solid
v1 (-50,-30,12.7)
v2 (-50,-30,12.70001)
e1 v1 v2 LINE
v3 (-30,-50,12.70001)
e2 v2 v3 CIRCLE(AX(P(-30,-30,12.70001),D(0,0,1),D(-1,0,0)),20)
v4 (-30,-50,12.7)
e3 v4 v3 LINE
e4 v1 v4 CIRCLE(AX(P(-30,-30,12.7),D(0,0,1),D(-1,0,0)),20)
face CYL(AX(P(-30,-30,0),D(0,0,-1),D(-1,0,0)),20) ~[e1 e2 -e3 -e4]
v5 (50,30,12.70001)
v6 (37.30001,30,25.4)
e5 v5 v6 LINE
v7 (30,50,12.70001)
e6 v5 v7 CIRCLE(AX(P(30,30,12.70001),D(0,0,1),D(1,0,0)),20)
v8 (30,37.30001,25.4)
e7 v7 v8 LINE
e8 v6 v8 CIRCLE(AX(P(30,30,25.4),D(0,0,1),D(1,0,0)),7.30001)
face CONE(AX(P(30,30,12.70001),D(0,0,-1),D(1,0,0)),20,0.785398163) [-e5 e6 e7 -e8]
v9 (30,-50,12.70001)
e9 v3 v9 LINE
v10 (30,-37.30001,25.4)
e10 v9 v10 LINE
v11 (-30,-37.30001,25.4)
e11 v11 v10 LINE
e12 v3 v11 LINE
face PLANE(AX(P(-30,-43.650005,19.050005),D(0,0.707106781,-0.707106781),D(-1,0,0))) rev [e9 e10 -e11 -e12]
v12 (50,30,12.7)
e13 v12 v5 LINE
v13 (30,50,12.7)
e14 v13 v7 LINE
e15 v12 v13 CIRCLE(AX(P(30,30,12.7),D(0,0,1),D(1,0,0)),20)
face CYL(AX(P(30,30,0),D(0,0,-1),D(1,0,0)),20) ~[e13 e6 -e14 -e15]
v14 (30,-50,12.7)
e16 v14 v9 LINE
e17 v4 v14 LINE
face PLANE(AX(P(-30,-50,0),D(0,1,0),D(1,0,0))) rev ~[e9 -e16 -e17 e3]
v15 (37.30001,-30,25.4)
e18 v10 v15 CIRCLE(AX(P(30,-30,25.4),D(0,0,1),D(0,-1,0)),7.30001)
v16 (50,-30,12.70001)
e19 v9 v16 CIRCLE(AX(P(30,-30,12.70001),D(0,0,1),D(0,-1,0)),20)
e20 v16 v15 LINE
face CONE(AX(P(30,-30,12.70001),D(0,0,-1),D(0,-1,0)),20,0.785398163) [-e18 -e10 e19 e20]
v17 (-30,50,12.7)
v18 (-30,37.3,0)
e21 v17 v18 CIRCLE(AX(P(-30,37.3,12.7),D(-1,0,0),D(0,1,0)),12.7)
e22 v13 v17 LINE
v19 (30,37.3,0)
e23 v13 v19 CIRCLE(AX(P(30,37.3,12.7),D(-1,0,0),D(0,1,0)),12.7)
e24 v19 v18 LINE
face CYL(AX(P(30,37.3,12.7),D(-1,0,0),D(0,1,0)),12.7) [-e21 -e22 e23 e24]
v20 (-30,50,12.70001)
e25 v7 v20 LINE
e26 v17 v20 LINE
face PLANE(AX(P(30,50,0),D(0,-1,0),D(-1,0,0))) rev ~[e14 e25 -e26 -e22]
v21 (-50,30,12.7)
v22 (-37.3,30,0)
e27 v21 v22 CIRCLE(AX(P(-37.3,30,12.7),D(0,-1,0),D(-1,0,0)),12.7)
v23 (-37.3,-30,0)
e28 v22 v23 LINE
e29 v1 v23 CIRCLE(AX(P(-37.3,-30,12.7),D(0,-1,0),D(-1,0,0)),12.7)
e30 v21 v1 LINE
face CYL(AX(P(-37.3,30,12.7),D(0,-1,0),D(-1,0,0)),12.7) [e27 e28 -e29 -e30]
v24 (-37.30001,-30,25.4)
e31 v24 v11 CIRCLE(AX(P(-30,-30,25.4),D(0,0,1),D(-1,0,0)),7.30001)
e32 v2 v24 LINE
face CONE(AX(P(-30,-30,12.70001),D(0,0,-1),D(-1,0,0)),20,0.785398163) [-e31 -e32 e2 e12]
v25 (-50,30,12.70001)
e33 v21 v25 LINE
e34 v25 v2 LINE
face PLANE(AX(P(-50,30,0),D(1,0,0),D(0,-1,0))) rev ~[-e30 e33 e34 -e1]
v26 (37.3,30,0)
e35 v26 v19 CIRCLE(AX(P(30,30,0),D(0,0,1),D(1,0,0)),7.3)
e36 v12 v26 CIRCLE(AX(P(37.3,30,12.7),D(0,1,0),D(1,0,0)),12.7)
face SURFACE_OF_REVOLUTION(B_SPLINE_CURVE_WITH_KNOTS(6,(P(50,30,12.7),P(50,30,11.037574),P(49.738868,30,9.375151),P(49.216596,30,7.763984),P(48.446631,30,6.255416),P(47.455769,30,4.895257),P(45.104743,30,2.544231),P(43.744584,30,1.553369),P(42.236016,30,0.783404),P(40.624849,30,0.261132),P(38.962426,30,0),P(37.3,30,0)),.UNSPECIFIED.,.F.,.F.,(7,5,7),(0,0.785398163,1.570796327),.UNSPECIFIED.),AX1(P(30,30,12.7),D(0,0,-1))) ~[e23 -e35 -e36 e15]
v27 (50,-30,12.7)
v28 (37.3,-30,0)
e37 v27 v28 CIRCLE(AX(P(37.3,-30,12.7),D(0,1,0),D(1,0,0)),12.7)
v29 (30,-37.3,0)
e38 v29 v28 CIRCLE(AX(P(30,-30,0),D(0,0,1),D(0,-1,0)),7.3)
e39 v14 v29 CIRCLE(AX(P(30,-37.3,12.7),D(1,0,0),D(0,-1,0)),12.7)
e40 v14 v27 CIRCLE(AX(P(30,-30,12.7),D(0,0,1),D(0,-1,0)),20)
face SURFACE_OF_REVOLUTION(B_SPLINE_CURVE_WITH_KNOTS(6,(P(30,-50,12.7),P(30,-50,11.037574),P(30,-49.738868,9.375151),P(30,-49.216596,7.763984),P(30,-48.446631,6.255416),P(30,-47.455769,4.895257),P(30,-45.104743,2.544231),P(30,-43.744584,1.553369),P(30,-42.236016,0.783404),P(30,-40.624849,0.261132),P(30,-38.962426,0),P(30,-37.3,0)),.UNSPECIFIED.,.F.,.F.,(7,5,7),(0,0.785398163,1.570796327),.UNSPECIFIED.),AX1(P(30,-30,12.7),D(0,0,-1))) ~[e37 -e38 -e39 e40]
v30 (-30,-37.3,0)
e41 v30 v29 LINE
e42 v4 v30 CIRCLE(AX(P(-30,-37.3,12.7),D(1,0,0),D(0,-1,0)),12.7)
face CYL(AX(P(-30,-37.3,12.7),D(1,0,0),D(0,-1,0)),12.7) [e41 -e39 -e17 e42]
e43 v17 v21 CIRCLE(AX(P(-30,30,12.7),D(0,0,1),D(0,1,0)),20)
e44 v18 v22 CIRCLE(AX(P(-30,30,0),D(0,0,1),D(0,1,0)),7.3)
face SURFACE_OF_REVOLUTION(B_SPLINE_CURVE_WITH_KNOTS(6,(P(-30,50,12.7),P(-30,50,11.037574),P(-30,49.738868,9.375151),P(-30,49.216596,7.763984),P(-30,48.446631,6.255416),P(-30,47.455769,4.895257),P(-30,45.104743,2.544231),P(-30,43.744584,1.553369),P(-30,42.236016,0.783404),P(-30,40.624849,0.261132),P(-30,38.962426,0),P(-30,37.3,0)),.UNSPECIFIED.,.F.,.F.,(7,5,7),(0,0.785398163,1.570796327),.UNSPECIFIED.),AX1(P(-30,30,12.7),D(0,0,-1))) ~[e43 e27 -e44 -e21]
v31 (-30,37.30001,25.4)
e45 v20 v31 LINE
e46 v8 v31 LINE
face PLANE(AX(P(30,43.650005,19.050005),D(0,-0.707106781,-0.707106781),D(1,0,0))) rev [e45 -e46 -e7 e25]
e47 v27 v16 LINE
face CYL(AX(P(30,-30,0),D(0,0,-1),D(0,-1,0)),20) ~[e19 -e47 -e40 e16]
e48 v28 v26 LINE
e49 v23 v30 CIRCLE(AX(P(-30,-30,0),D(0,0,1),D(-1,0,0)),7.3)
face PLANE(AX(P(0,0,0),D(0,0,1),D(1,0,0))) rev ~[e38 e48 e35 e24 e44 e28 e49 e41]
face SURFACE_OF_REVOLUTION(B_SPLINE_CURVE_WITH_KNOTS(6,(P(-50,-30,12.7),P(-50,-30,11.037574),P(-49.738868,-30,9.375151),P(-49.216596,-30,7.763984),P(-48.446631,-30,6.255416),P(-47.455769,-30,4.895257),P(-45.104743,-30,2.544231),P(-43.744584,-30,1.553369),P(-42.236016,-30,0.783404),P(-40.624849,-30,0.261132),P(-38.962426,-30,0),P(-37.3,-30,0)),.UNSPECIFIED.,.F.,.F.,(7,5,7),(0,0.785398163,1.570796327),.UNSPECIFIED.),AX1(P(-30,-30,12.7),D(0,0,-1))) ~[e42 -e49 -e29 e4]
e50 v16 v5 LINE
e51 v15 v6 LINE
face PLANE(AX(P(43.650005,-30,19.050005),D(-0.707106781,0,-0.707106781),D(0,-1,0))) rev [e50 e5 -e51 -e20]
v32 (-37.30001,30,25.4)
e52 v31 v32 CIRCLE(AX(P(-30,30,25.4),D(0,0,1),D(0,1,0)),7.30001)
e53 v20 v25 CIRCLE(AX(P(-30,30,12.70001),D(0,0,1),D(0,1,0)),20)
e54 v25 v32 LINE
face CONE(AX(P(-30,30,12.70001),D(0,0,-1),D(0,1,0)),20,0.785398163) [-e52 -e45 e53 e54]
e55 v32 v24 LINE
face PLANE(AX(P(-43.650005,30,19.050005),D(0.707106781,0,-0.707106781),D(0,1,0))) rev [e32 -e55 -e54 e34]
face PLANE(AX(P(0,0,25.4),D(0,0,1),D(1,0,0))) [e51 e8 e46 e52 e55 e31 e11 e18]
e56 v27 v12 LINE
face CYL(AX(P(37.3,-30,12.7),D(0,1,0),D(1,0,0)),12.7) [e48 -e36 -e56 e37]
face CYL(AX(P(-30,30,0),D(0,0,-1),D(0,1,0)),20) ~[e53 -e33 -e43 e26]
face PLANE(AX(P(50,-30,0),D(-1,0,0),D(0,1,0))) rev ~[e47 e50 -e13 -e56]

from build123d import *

# Parameters (mm, degrees)
F1_DEPTH = 25.4
F2_R     = 12.7
F3_SIZE  = 12.69999


# Not quite as in the source:
# - a fillet or chamfer is up to 0.001 mm smaller than in the source, because OpenCascade refuses the exact size


with BuildPart() as f1:
    # F0 (on Top) → F1 (new body)
    with BuildSketch(Plane.XY):
        with BuildLine():
            ThreePointArc((-50, -30), (-44.1421356237, -44.1421356237), (-30, -50))
            Line((-30, -50), (30, -50))
            ThreePointArc((30, -50), (44.1421356237, -44.1421356237), (50, -30))
            Line((50, -30), (50, 30))
            ThreePointArc((50, 30), (44.1421356237, 44.1421356237), (30, 50))
            Line((30, 50), (-30, 50))
            ThreePointArc((-30, 50), (-44.1421356237, 44.1421356237), (-50, 30))
            Line((-50, 30), (-50, -30))
        make_face()
    extrude(amount=F1_DEPTH)

    # F2
    f2_edges = [f1.edges().sort_by_distance(p)[0] for p in [
        (-44.142136, -44.142136, 0),
        (0, -50, 0),
        (44.142136, -44.142136, 0),
        (50, 0, 0),
        (44.142136, 44.142136, 0),
        (0, 50, 0),
        (-44.142136, 44.142136, 0),
        (-50, 0, 0),
    ]]
    fillet(f2_edges, radius=F2_R)

    # F3 (size 12.7 in the source; OpenCascade refuses exactly that, so slightly less here)
    f3_edges = [f1.edges().sort_by_distance(p)[0] for p in [
        (-44.142136, -44.142136, 25.4),
        (0, -50, 25.4),
        (44.142136, -44.142136, 25.4),
        (50, 0, 25.4),
        (44.142136, 44.142136, 25.4),
        (0, 50, 25.4),
        (-44.142136, 44.142136, 25.4),
        (-50, 0, 25.4),
    ]]
    chamfer(f3_edges, length=F3_SIZE)


solid = f1.part
